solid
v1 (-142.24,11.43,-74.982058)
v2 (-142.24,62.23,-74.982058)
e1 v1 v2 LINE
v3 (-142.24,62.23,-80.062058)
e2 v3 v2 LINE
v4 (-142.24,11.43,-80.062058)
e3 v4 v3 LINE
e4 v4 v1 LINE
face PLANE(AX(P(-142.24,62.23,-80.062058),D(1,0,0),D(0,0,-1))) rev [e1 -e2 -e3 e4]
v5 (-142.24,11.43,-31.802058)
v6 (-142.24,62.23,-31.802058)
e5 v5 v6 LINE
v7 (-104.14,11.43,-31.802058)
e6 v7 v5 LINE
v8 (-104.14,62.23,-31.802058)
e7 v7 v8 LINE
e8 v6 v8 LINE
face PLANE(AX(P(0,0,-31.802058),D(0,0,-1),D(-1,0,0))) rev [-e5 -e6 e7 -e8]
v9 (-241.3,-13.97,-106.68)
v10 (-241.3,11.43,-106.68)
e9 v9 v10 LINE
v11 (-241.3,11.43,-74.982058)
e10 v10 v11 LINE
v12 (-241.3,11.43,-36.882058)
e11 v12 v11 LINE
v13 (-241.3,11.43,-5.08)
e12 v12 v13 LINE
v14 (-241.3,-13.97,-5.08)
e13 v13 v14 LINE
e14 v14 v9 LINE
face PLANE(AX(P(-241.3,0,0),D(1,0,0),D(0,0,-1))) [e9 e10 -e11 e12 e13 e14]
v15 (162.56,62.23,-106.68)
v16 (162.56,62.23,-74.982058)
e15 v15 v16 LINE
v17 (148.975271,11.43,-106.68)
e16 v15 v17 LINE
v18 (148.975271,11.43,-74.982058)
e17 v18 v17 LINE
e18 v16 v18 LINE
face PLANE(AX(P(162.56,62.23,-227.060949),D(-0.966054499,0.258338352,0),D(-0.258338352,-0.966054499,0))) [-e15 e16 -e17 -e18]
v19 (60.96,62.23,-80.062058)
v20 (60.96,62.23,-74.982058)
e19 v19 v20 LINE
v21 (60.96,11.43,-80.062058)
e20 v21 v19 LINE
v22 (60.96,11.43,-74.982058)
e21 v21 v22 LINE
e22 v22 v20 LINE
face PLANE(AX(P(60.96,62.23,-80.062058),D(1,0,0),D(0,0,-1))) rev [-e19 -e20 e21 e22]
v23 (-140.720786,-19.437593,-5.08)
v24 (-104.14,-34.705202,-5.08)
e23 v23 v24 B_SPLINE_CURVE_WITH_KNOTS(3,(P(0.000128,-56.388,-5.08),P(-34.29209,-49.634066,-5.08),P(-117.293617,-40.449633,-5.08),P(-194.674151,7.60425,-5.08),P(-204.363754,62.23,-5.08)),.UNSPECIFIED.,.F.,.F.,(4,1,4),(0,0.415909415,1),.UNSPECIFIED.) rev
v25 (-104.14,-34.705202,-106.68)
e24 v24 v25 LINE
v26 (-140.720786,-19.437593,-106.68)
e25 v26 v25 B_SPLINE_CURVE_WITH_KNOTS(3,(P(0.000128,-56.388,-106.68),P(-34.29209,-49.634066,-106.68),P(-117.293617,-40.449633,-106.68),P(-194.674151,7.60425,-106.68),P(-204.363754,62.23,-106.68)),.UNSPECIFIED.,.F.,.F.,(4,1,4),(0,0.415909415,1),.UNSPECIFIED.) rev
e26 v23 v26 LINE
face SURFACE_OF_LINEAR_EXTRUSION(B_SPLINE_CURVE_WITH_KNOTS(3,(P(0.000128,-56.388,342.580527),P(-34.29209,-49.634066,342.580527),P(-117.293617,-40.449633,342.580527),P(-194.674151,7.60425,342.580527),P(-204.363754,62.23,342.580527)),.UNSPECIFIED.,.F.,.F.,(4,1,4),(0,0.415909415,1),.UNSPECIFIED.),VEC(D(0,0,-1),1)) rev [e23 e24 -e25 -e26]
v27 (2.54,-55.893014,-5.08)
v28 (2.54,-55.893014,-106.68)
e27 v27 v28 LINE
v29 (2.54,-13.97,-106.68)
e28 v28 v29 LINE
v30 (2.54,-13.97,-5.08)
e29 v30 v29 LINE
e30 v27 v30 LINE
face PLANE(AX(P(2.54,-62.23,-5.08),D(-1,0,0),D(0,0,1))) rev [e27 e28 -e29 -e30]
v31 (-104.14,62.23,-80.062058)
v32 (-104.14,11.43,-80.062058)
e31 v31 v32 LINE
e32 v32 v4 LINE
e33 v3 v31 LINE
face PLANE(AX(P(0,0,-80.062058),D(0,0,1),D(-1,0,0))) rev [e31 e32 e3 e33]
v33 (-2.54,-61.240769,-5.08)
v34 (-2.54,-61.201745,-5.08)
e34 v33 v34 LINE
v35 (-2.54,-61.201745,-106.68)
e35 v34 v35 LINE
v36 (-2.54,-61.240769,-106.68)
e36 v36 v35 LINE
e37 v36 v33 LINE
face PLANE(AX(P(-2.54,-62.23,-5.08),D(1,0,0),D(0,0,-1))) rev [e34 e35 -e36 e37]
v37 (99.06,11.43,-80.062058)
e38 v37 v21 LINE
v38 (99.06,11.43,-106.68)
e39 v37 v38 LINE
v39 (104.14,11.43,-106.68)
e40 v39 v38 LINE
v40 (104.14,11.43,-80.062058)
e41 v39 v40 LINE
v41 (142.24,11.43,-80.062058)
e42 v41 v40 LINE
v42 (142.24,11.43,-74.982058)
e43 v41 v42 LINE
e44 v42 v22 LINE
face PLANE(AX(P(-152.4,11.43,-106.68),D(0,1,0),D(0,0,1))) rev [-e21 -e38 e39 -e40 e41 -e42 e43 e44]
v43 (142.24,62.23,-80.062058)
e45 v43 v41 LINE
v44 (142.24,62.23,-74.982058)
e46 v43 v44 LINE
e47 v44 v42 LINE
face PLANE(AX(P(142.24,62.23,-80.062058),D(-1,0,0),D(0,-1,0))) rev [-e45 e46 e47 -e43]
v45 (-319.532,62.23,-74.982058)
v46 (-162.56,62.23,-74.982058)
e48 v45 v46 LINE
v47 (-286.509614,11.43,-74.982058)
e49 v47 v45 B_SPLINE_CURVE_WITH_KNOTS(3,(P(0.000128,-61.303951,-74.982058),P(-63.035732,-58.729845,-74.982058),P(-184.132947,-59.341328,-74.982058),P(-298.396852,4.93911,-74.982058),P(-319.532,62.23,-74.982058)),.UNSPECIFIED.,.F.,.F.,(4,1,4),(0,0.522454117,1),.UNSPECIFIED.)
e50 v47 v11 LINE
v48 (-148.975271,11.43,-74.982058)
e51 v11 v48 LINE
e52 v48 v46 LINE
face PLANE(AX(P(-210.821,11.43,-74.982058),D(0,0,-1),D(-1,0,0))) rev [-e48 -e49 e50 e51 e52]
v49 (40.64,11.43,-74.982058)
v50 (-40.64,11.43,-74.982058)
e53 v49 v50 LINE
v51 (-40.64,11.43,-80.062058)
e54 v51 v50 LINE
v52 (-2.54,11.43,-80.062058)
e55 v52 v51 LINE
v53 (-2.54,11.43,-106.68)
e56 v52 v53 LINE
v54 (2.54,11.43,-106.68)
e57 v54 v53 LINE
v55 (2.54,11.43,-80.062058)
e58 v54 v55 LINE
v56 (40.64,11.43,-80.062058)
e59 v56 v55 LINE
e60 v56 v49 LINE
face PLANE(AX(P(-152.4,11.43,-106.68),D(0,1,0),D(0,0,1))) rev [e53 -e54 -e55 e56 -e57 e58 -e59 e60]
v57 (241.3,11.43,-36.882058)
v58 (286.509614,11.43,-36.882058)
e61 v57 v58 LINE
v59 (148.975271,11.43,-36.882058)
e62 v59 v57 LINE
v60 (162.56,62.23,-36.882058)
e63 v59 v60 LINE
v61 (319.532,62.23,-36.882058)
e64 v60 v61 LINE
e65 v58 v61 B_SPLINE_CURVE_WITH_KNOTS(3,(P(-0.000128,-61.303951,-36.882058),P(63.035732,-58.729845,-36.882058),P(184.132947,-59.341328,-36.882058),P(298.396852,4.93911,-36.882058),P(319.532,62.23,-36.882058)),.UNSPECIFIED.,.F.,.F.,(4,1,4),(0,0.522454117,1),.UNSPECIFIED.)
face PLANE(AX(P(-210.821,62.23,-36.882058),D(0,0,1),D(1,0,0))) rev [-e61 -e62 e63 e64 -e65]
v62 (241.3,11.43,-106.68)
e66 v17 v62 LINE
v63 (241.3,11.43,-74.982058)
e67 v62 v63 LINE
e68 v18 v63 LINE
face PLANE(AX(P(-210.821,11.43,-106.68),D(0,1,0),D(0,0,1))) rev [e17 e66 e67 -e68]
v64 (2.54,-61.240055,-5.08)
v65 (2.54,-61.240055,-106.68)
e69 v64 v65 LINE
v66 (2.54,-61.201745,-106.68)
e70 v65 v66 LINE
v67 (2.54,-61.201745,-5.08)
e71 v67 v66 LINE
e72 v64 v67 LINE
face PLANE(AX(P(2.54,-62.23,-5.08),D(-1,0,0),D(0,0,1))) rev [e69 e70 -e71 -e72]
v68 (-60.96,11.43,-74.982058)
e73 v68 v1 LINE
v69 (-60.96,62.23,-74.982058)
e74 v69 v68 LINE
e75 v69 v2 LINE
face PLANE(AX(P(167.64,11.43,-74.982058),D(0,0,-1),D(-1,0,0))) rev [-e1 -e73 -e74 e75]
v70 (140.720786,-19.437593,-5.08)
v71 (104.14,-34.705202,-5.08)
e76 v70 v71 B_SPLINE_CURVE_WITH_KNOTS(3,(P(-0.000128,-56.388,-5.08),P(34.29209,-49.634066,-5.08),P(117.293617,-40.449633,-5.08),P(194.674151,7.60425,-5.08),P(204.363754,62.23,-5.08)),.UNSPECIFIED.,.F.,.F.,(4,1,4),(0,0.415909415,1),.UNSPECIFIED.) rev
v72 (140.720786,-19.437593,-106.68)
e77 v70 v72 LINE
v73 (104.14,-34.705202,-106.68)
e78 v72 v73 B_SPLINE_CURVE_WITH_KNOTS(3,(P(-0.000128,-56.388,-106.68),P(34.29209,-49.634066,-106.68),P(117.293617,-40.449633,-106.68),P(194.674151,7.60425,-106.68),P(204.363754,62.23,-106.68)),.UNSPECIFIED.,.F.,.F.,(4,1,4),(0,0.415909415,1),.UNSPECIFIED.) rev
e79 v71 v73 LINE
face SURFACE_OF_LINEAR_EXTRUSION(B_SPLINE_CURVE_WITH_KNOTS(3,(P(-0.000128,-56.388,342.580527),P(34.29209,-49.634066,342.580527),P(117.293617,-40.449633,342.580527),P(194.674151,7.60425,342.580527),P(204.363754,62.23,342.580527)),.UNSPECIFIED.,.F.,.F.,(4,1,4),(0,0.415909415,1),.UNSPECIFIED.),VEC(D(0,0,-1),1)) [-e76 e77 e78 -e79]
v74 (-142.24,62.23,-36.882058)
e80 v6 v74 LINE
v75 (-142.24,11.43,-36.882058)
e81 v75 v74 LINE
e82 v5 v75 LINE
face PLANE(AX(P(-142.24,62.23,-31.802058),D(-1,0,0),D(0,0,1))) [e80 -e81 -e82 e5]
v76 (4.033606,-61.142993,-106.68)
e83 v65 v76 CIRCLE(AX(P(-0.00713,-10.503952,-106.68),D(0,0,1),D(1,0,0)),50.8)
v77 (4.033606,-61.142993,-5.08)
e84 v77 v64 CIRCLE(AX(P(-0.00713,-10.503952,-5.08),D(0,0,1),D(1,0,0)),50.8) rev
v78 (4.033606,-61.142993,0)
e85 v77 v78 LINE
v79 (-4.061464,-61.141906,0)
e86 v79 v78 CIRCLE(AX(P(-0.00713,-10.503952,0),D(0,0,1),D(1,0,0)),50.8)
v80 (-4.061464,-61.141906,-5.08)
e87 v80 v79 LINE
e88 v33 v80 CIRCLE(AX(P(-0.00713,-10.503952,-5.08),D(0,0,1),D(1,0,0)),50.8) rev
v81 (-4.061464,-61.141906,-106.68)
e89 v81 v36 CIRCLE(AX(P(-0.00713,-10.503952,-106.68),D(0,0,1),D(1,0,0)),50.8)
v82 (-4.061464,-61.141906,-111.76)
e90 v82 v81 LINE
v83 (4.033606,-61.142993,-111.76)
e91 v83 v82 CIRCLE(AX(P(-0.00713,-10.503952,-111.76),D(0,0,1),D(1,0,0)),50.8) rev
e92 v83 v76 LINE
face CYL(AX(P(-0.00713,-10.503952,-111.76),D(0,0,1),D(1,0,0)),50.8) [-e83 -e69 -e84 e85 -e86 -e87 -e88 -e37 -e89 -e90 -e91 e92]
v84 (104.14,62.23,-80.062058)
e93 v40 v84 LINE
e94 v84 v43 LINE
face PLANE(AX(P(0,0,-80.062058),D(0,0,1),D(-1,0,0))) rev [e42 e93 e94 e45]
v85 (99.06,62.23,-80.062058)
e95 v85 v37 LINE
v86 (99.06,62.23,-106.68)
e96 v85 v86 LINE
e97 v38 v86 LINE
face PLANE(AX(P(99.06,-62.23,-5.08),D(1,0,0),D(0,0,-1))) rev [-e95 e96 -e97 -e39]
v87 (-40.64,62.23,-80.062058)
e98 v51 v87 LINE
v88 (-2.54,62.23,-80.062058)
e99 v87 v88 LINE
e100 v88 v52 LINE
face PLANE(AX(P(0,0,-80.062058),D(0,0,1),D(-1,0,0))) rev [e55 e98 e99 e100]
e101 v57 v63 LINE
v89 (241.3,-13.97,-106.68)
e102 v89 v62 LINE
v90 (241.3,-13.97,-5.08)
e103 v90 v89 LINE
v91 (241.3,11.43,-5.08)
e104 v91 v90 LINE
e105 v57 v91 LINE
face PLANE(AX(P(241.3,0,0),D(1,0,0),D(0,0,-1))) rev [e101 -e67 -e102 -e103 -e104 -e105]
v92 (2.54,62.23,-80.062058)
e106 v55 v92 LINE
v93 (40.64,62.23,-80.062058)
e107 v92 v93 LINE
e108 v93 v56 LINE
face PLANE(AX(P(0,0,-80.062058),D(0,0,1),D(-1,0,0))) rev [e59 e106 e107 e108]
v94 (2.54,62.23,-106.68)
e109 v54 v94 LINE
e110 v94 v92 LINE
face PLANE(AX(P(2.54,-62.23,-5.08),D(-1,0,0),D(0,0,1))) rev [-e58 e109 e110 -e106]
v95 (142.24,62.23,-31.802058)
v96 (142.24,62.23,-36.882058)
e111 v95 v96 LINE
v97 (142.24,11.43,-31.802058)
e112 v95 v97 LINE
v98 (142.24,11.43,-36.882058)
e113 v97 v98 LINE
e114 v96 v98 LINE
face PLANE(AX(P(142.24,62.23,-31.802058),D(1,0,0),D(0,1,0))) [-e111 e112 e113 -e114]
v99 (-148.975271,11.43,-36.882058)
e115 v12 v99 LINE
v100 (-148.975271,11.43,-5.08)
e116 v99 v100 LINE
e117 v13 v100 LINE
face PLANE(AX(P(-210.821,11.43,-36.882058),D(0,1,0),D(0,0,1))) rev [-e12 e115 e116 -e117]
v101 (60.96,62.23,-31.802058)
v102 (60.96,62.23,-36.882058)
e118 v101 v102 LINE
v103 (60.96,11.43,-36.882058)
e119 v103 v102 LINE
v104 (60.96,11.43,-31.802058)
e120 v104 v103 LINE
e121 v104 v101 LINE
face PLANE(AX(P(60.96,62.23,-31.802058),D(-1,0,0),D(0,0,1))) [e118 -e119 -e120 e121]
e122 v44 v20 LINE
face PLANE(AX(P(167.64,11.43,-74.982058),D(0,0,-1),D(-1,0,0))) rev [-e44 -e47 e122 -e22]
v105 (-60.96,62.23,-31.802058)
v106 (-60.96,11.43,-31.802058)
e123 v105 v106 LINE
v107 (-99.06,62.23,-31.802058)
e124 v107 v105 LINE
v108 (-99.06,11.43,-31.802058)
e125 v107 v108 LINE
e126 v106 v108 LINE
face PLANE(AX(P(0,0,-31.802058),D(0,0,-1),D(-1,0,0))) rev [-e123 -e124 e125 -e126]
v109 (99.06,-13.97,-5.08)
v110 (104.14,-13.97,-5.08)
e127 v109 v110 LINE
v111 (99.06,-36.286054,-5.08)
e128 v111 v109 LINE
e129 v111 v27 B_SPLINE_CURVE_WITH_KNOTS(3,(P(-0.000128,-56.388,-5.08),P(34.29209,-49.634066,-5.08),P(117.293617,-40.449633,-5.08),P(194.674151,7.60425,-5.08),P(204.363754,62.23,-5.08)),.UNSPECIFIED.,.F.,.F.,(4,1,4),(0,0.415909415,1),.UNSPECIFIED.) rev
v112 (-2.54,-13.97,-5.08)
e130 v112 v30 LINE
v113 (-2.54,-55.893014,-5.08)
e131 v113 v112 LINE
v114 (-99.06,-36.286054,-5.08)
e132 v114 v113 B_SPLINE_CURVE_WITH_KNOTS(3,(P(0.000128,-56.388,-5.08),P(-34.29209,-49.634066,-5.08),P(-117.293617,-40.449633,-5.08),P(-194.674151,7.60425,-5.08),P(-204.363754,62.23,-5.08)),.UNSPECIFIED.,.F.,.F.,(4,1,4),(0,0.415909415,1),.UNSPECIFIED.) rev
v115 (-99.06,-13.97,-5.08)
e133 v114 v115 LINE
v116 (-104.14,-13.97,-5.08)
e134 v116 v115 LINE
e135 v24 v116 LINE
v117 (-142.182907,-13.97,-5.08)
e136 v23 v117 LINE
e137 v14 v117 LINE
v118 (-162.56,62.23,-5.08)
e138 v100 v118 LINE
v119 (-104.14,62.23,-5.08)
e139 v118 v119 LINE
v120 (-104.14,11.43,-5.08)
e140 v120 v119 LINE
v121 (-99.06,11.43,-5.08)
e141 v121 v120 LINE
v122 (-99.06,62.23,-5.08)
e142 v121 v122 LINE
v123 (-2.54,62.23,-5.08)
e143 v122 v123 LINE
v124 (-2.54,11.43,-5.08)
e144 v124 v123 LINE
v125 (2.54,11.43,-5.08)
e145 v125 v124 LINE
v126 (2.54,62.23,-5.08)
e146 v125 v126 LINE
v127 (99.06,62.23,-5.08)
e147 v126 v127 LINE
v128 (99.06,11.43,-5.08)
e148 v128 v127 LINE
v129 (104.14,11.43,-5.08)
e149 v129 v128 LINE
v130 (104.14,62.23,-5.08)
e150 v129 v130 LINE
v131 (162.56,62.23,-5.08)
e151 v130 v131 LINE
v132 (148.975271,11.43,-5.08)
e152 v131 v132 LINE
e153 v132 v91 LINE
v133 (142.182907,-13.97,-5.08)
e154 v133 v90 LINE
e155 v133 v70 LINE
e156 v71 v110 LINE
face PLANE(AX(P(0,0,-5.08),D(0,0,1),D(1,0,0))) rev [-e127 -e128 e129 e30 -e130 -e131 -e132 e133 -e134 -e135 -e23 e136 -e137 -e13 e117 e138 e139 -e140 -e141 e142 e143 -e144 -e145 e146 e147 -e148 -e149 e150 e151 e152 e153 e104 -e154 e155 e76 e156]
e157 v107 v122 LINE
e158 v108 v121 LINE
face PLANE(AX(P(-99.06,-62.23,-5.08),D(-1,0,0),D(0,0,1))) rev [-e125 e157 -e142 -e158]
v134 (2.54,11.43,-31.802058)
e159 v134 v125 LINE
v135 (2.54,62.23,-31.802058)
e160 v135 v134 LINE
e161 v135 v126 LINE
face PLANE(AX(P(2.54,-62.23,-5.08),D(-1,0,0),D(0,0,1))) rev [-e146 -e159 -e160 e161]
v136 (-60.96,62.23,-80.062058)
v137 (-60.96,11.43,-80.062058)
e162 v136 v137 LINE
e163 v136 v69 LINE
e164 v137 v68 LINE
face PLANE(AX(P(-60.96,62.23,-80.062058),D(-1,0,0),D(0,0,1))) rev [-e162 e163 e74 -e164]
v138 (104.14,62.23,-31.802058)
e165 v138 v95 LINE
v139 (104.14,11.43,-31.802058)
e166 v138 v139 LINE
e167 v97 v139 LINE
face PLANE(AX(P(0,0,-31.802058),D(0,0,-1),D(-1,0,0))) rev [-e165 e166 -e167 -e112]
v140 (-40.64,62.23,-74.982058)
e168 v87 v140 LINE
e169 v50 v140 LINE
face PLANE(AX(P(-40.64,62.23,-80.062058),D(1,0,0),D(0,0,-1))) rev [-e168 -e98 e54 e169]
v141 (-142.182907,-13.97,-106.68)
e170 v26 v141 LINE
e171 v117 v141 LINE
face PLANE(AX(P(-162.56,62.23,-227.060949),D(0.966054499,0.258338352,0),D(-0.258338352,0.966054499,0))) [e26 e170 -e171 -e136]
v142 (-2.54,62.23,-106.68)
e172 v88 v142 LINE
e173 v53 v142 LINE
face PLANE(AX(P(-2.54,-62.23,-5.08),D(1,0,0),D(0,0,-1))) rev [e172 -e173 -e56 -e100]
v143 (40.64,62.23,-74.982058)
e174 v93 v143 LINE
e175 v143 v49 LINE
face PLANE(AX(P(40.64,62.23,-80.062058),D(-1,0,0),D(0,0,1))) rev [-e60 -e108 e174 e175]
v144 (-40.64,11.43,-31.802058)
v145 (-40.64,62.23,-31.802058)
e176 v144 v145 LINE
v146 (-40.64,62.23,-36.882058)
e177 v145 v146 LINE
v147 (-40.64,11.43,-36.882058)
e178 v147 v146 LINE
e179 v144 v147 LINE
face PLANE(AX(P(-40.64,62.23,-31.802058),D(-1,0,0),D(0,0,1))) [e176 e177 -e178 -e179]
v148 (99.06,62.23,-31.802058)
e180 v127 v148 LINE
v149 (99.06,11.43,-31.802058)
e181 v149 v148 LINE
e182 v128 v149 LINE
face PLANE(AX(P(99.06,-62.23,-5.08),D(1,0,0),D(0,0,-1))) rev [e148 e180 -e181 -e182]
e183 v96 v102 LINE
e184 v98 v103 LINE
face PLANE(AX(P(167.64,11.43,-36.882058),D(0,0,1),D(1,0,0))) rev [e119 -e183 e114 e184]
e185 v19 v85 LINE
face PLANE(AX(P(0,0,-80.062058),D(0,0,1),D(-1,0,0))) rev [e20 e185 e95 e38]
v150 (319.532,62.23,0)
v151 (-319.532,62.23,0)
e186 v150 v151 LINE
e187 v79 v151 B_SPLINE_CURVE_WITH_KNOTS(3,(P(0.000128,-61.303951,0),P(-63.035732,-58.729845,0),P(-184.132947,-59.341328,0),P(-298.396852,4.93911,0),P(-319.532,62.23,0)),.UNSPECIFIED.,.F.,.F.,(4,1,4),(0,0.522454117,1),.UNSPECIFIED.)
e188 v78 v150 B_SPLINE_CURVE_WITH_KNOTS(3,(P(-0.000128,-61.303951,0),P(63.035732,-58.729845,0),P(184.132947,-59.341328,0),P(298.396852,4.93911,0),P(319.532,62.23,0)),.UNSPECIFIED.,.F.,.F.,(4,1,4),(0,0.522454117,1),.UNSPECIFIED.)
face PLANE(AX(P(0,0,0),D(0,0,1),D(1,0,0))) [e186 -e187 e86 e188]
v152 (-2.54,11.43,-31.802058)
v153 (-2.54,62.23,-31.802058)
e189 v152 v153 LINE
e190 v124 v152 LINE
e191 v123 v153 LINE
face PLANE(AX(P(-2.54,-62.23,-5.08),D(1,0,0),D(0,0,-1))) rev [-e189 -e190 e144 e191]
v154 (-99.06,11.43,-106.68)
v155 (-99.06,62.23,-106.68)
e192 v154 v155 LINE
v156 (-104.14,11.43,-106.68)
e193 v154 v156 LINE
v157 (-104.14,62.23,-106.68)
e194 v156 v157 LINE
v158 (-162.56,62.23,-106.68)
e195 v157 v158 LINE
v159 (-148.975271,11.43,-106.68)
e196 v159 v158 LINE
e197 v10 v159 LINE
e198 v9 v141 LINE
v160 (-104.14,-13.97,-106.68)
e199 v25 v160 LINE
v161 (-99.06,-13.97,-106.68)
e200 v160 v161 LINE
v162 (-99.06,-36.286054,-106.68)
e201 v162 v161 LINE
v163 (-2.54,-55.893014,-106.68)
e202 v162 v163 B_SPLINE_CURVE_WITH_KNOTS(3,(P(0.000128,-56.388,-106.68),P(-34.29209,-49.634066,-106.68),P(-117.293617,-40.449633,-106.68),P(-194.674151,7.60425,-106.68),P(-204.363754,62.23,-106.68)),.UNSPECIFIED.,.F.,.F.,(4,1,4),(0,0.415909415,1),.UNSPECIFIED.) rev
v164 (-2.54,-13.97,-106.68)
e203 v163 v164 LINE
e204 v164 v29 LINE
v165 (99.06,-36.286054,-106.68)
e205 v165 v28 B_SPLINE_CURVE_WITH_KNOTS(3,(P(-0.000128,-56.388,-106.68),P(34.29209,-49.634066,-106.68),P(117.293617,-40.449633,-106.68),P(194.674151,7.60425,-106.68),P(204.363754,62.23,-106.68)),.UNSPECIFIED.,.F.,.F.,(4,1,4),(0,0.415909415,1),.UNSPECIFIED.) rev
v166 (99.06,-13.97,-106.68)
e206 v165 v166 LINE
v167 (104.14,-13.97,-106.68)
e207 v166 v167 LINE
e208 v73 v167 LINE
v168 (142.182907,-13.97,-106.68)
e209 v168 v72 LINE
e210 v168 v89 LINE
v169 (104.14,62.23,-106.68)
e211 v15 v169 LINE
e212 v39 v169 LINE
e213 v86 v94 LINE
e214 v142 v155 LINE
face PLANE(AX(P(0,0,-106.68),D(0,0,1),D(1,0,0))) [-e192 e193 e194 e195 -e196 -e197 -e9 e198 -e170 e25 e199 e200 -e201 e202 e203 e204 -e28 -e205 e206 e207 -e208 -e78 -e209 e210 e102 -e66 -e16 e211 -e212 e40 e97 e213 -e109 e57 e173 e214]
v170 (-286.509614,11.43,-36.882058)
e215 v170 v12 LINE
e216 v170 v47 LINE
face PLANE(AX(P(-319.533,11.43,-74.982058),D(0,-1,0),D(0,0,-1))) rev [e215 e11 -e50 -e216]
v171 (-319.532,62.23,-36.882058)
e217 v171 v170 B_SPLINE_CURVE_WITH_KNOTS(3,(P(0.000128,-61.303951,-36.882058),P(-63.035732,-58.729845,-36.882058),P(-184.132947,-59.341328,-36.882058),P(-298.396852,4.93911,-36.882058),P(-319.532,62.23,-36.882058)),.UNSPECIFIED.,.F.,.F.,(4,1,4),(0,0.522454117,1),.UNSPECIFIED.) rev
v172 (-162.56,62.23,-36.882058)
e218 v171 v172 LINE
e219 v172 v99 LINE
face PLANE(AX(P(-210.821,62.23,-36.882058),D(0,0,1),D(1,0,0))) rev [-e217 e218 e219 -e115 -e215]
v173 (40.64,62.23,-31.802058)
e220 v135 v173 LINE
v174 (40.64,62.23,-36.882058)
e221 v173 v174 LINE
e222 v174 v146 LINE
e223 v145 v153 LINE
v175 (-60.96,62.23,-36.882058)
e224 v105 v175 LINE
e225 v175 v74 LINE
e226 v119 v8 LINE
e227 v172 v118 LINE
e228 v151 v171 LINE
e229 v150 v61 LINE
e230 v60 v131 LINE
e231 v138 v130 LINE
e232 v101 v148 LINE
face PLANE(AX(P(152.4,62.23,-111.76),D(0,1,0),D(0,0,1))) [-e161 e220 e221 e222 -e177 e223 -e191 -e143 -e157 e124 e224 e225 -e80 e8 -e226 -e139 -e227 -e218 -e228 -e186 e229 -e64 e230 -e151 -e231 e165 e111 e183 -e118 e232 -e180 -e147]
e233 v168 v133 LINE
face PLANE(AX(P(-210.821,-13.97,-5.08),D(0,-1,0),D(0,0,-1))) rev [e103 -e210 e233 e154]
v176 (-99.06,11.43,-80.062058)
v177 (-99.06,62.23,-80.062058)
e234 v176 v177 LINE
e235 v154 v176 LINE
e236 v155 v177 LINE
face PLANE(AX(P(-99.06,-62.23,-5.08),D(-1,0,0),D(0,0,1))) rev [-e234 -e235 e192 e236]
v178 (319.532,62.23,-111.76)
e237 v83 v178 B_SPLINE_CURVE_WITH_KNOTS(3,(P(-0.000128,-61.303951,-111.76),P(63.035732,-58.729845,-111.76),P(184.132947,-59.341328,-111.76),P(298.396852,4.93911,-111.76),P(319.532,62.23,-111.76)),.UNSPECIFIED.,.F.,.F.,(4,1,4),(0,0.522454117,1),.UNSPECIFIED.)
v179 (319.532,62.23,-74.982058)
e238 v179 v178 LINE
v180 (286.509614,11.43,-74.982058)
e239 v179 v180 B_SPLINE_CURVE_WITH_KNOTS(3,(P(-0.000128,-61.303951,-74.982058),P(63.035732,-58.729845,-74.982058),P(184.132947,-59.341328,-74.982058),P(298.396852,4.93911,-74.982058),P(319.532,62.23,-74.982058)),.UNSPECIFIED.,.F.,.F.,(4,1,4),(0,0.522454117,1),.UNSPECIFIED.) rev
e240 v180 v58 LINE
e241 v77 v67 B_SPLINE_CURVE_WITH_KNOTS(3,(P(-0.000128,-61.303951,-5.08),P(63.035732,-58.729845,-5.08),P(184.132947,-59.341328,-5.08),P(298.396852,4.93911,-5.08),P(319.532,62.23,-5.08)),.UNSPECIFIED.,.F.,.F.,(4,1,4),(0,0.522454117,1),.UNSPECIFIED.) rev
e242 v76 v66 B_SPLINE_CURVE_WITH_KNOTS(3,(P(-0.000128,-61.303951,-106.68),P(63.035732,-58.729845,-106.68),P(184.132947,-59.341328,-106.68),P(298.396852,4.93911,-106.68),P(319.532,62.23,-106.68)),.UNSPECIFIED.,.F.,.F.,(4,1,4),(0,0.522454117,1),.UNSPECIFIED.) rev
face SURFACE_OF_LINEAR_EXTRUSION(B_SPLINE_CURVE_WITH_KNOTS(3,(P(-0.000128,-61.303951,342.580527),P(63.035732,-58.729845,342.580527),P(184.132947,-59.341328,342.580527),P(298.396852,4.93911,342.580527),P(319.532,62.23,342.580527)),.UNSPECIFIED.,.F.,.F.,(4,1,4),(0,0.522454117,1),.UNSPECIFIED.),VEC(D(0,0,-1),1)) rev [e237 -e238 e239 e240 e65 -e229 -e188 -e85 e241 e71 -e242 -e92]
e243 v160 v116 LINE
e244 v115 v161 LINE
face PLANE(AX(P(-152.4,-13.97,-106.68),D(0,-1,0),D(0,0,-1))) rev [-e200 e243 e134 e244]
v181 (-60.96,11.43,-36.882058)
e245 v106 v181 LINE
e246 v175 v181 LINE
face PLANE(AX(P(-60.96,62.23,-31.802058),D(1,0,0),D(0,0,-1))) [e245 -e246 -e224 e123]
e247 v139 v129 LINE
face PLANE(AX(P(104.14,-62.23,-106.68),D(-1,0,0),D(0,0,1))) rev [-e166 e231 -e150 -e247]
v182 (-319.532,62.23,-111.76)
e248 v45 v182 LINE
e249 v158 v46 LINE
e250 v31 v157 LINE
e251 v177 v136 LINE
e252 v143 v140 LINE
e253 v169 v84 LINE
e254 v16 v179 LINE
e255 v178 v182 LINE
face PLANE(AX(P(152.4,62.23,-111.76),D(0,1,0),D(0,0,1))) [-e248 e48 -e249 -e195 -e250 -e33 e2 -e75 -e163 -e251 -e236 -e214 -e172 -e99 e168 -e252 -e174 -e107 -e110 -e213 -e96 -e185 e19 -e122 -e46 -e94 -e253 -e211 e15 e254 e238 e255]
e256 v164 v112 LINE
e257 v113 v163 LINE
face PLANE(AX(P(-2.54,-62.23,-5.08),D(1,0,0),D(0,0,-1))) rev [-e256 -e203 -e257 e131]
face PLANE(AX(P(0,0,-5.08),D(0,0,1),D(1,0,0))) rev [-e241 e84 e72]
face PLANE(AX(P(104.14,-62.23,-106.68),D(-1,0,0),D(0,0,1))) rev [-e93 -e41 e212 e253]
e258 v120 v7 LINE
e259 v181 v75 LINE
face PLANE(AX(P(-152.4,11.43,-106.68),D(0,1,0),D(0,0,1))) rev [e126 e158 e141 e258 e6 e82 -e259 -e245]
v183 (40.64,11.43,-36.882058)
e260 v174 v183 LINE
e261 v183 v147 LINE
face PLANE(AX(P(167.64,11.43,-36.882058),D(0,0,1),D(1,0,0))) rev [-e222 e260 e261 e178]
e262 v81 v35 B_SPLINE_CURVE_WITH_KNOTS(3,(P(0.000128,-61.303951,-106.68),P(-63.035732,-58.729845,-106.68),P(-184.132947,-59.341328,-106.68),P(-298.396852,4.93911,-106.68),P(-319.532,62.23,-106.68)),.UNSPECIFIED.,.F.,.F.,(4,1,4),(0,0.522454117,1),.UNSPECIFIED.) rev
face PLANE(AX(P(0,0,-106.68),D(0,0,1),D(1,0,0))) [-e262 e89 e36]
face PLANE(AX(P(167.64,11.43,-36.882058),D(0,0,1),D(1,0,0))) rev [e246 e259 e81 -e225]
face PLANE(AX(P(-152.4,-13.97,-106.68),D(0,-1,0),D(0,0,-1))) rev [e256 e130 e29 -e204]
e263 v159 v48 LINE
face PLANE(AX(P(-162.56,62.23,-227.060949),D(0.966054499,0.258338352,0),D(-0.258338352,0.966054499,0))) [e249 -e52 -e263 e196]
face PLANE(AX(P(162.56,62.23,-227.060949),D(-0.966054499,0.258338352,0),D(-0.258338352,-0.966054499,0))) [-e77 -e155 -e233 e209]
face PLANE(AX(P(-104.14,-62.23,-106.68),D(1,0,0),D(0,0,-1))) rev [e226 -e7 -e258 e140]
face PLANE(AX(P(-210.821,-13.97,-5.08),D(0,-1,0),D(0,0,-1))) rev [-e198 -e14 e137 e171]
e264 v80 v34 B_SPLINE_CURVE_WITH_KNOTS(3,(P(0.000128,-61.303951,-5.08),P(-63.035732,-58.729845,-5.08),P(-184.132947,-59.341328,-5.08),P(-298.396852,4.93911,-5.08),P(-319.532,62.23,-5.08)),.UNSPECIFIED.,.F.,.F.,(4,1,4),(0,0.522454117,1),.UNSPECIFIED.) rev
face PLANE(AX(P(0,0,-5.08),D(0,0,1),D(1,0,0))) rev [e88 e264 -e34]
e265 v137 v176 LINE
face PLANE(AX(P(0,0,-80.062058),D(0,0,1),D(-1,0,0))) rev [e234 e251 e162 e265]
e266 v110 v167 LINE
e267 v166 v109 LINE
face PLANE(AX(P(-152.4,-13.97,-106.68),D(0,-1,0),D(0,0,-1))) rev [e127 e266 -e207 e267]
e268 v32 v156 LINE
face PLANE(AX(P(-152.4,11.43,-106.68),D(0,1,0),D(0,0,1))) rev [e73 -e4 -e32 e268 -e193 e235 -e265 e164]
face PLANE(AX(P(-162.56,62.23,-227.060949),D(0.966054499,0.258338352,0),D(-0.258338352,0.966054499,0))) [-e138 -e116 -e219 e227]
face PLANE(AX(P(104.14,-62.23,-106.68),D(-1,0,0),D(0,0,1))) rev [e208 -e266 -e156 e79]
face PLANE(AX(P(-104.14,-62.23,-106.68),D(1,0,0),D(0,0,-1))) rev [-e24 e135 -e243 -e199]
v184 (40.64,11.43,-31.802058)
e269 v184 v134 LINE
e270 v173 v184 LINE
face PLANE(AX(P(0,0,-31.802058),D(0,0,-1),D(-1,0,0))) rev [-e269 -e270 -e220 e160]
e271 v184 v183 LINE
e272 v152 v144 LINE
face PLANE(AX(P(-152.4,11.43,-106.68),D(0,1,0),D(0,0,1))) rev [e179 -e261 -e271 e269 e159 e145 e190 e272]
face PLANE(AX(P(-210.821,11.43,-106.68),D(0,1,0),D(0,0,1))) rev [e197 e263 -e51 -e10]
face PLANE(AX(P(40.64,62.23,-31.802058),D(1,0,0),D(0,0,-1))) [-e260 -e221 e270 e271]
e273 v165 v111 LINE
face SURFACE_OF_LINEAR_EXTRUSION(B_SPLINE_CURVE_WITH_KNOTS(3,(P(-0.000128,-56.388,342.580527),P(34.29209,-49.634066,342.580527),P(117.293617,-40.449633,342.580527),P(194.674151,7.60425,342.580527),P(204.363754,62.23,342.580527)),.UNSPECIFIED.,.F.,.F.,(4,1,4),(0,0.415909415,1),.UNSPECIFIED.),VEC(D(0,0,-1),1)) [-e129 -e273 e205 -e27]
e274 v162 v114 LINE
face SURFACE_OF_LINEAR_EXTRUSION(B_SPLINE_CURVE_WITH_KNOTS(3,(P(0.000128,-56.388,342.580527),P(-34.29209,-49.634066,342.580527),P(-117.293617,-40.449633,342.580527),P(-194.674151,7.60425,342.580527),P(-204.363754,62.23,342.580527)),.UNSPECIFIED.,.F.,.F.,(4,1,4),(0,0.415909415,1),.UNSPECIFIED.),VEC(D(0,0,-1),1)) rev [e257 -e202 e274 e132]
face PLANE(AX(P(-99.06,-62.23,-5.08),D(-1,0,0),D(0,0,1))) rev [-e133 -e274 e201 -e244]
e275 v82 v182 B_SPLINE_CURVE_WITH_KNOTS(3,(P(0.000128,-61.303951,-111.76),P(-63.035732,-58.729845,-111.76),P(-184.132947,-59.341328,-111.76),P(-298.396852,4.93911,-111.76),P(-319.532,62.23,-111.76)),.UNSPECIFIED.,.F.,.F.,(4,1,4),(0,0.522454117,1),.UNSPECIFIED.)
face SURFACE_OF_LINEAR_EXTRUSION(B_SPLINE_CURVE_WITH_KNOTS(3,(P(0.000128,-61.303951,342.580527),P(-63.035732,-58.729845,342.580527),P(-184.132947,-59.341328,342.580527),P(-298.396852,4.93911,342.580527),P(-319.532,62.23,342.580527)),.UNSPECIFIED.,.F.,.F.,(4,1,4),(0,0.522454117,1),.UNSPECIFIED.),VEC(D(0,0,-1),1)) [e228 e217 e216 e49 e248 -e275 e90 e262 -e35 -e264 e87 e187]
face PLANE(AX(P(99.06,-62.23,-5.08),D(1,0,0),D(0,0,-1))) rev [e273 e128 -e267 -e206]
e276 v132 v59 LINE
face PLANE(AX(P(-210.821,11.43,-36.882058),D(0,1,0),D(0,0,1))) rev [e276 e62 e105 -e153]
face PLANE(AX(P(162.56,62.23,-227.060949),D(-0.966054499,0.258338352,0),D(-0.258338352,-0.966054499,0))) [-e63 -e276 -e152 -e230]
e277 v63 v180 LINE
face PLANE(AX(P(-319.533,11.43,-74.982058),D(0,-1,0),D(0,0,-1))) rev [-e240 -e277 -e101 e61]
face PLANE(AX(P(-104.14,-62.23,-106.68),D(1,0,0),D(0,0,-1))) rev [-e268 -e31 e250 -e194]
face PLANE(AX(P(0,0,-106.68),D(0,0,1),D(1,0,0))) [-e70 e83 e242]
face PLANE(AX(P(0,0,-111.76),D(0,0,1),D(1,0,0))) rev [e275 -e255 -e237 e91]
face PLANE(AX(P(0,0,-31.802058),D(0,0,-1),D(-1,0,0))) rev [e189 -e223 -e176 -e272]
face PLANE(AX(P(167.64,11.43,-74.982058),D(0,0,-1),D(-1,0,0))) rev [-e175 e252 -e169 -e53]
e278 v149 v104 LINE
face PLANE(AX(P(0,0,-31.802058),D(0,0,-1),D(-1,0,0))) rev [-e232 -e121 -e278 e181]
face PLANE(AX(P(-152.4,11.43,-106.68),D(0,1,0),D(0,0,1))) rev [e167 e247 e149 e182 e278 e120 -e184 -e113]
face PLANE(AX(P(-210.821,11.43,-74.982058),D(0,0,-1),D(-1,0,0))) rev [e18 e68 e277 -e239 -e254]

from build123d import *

# Parameters (mm, degrees)
BOSS_EXTRUDE1_DEPTH                 = 111.76
SKETCH5_W                           = 304.8
SKETCH5_H                           = 25.4
CUT_EXTRUDE3_DEPTH                  = 101.6
CUT_EXTRUDE4_DEPTH                  = 227.288199427
CUT_EXTRUDE4_DEPTH_BACK             = 227.288199427
SKETCH3_W                           = 96.52
SKETCH3_H                           = 101.6
SKETCH3_W_2                         = 48.26
CUT_EXTRUDE5_REACH                  = 288.663
SKETCH6_W                           = 38.1
SKETCH6_H                           = 50.8
SKETCH7_W                           = 81.28
SKETCH7_H                           = 50.8
BOSS_EXTRUDE2_DEPTH                 = 5.08
SKETCH9_W                           = 5.08
SKETCH9_H                           = 95.25
BOSS_EXTRUDE3_DEPTH                 = 10.16
SKETCH10_W                          = 5.08
SKETCH10_H                          = 95.206439839
BOSS_EXTRUDE4_DEPTH                 = 10.16
CUT_EXTRUDE7_REACH                  = 208.854
FILLET1_R                           = 50.8
BOSS_EXTRUDE5_REACH                 = 208.854
CUT_EXTRUDE8_REACH                  = 248.593
CUT_EXTRUDE8_END_RADIUS             = 126.32098656
CUT_EXTRUDE8_DIRECTION_2_REACH      = 248.593
CUT_EXTRUDE8_DIRECTION_2_END_RADIUS = 126.32098656
BOSS_EXTRUDE6_REACH                 = 248.593
CUT_EXTRUDE9_DEPTH                  = 241.3
CUT_EXTRUDE9_DEPTH_BACK             = 241.3
CUT_EXTRUDE10_REACH                 = 346.185
SKETCH16_W                          = 38.1
SKETCH16_H                          = 50.8
CUT_EXTRUDE10_DIRECTION_2_REACH     = 346.185


with BuildPart() as part:
    # Sketch1 → Boss-Extrude1 (new body)
    with BuildSketch(Plane.XY):
        Polygon((-152.4, 62.23), (-152.4, -33.02), (0, -62.23), (152.4, -32.976439839), (152.4, 62.23), align=None)
    extrude(amount=-BOSS_EXTRUDE1_DEPTH)

    # Sketch5 → Cut-Extrude3 (cut)
    with BuildSketch(Plane.XY.offset(-5.08)):
        with Locations((0, -1.27)):
            Rectangle(SKETCH5_W, SKETCH5_H)
    extrude(amount=-CUT_EXTRUDE3_DEPTH, mode=Mode.SUBTRACT)

    # Sketch3 → Cut-Extrude4 (cut, two sides: drawn at the far end of the back side and taken through both)
    with BuildSketch(Plane(origin=(0, 62.23, 0), x_dir=(1, 0, 0), z_dir=(0, 1, 0)).offset(-CUT_EXTRUDE4_DEPTH_BACK)):
        with Locations((-50.8, 55.88)):
            Rectangle(SKETCH3_W, SKETCH3_H)
        with Locations((50.8, 55.88)):
            Rectangle(SKETCH3_W, SKETCH3_H)
        with Locations((-128.27, 55.88)):
            Rectangle(SKETCH3_W_2, SKETCH3_H)
        with Locations((128.27, 55.88)):
            Rectangle(SKETCH3_W_2, SKETCH3_H)
    extrude(amount=CUT_EXTRUDE4_DEPTH + CUT_EXTRUDE4_DEPTH_BACK, mode=Mode.SUBTRACT)

    # Cut-Extrude5: up to this face of the body (flat: up to its plane)
    cut_extrude5_end = Plane(part.part.faces().sort_by_distance((104.14, 36.83, -55.88))[0])
    # Sketch6 → Cut-Extrude5 (cut, up to the picked face)
    with BuildSketch(Plane.ZY.offset(104.14), mode=Mode.PRIVATE) as cut_extrude5_sk1:
        with Locations((-55.932057734, 36.83)):
            Rectangle(SKETCH6_W, SKETCH6_H)
    cut_extrude5_tool1 = split(extrude(cut_extrude5_sk1.sketch, amount=-CUT_EXTRUDE5_REACH, mode=Mode.PRIVATE), bisect_by=cut_extrude5_end, keep=Keep.BOTH, mode=Mode.PRIVATE)
    add(cut_extrude5_tool1.solids().sort_by(Axis((-104.14, 36.83, -55.932058), (1, 0, 0)))[0], mode=Mode.SUBTRACT)

    # Sketch7 → Boss-Extrude2 (add)
    with BuildSketch(Plane(origin=(0, 0, -36.882057734), x_dir=(-1, 0, 0), z_dir=(0, 0, -1))):
        with Locations((0, 36.83)):
            Rectangle(SKETCH7_W, SKETCH7_H)
        with Locations((101.6, 36.83)):
            Rectangle(SKETCH7_W, SKETCH7_H)
        with Locations((-101.6, 36.83)):
            Rectangle(SKETCH7_W, SKETCH7_H)
    boss_extrude2 = extrude(amount=-BOSS_EXTRUDE2_DEPTH)

    # Mirror1: Boss-Extrude2 across plane
    add(boss_extrude2.mirror(Plane(origin=(0, 0, -55.932057734), x_dir=(1, 0, 0), z_dir=(0, 0, -1))))

    # Sketch9 → Boss-Extrude3 (add)
    with BuildSketch(Plane.ZY.offset(152.4)):
        with Locations((-109.22, 14.605)):
            Rectangle(SKETCH9_W, SKETCH9_H)
        with Locations((-2.54, 14.605)):
            Rectangle(SKETCH9_W, SKETCH9_H)
    extrude(amount=BOSS_EXTRUDE3_DEPTH)

    # Sketch10 → Boss-Extrude4 (add)
    with BuildSketch(Plane(origin=(152.4, 0, 0), x_dir=(0, 0, -1), z_dir=(1, 0, 0))):
        with Locations((2.54, 14.626780081)):
            Rectangle(SKETCH10_W, SKETCH10_H)
        with Locations((109.22, 14.626780081)):
            Rectangle(SKETCH10_W, SKETCH10_H)
    extrude(amount=BOSS_EXTRUDE4_DEPTH)

    # Cut-Extrude7: up to this face of the body (flat: up to its plane)
    cut_extrude7_end = Plane(part.part.faces().sort_by_distance((-0.011490312, 7.400814094, -111.76))[0])
    # Sketch11 → Cut-Extrude7 (cut, up to the picked face)
    with BuildSketch(Plane.XY, mode=Mode.PRIVATE) as cut_extrude7_sk1:
        Polygon((-162.56, -12.7), (-119.696308585, -39.288207521), (-152.4, -33.02), (-162.56, -33.02), align=None)
    cut_extrude7_tool1 = split(extrude(cut_extrude7_sk1.sketch, amount=-CUT_EXTRUDE7_REACH, mode=Mode.PRIVATE), bisect_by=cut_extrude7_end, keep=Keep.BOTH, mode=Mode.PRIVATE)
    # Sketch11 → Cut-Extrude7 (cut, up to the picked face)
    with BuildSketch(Plane.XY, mode=Mode.PRIVATE) as cut_extrude7_sk2:
        Polygon((152.4, -33.02), (162.56, -33.02), (162.56, -12.7), (119.696308585, -39.288207521), align=None)
    cut_extrude7_tool2 = split(extrude(cut_extrude7_sk2.sketch, amount=-CUT_EXTRUDE7_REACH, mode=Mode.PRIVATE), bisect_by=cut_extrude7_end, keep=Keep.BOTH, mode=Mode.PRIVATE)
    add(cut_extrude7_tool1.solids().sort_by(Axis((-148.539263, -27.801749, 0), (0, 0, -1)))[0], mode=Mode.SUBTRACT)
    add(cut_extrude7_tool2.solids().sort_by(Axis((148.539263, -27.801749, 0), (0, 0, -1)))[0], mode=Mode.SUBTRACT)

    # Fillet1
    # the kernel refuses this fillet: 50.8 mm, written as the material it takes off along each edge
    with BuildSketch(Plane(origin=(-162.56, -12.7, 70.671047804), x_dir=(0.8497897447130388, -0.5271217978613181, 0), z_dir=(0, 0, -1)), Plane(origin=(-162.56, -12.7, -36.008952196), x_dir=(0.8497897447130388, -0.5271217978613181, 0), z_dir=(0, 0, -1)), Plane(origin=(162.56, -12.7, 70.671047804), x_dir=(0, 1, 0), z_dir=(0, 0, -1))) as fillet1_piece_1:
        with BuildLine():
            CenterArc((FILLET1_R * 0.556464943335, -FILLET1_R), FILLET1_R, 90, 58.188808221)
            Line((-FILLET1_R * 0.293324801378, -FILLET1_R * 0.472878202139), (0, 0))
            Line((0, 0), (FILLET1_R * 0.556464943335, 0))
        make_face()
    extrude(amount=146.422095607, mode=Mode.SUBTRACT)
    with BuildSketch(Plane(origin=(-119.696308585, -39.288207521, -83.186546401), x_dir=(0.9821230119270369, -0.18824024395268216, 0), z_dir=(0, 0, -1)), Plane(origin=(-119.696308585, -39.288207521, 23.493453599), x_dir=(0.9821230119270369, -0.18824024395268216, 0), z_dir=(0, 0, -1))) as fillet1_piece_2:
        with BuildLine():
            CenterArc((FILLET1_R * 0.184987823618, -FILLET1_R), FILLET1_R, 90, 20.961087149)
            Line((-FILLET1_R * 0.172745995297, -FILLET1_R * 0.0661764005955), (0, 0))
            Line((0, 0), (FILLET1_R * 0.184987823618, 0))
        make_face()
    extrude(amount=52.066907199, mode=Mode.SUBTRACT)
    with BuildSketch(Plane(origin=(162.56, -12.7, -36.008952196), x_dir=(-0.8497897447130388, -0.5271217978613181, 0), z_dir=(0, 0, -1))) as fillet1_piece_3:
        with BuildLine():
            CenterArc((FILLET1_R * 0.556464943335, FILLET1_R), FILLET1_R, 211.811191779, 58.188808221)
            Line((-FILLET1_R * 0.293324801378, FILLET1_R * 0.472878202139), (0, 0))
            Line((0, 0), (FILLET1_R * 0.556464943335, 0))
        make_face()
    extrude(amount=146.422095607, mode=Mode.SUBTRACT)
    with BuildSketch(Plane(origin=(119.776180176, -39.238663434, -83.204651008), x_dir=(-0.9820710795721669, -0.18851099349363817, 0), z_dir=(0, 0, -1)), Plane(origin=(119.776180176, -39.238663434, 23.475348992), x_dir=(-0.9820710795721669, -0.18851099349363817, 0), z_dir=(0, 0, -1))) as fillet1_piece_4:
        with BuildLine():
            CenterArc((FILLET1_R * 0.184845267653, FILLET1_R), FILLET1_R, 249.054708445, 20.945291555)
            Line((-FILLET1_R * 0.172631096402, FILLET1_R * 0.0660778141933), (0, 0))
            Line((0, 0), (FILLET1_R * 0.184845267653, 0))
        make_face()
    extrude(amount=52.030697984, mode=Mode.SUBTRACT)
    with BuildSketch(Plane(origin=(0, -62.23, 24.359816254), x_dir=(-0.982123011927037, 0.1882402439526816, 0), z_dir=(0, 0, -1))) as fillet1_piece_5:
        with BuildLine():
            CenterArc((FILLET1_R * 0.191809576801, FILLET1_R), FILLET1_R, 248.283995147, 21.716004853)
            Line((-FILLET1_R * 0.178196707507, FILLET1_R * 0.0709707488072), (0, 0))
            Line((0, 0), (FILLET1_R * 0.191809576801, 0))
        make_face()
    extrude(amount=160.479632508, mode=Mode.SUBTRACT)

    # Boss-Extrude5: up to this face of the body (flat: up to its plane)
    boss_extrude5_end = Plane(part.part.faces().sort_by_distance((-0.004732582, 8.379000895, -111.76))[0])
    # Sketch12 → Boss-Extrude5 (add, up to the picked face)
    with BuildSketch(Plane.XY, mode=Mode.PRIVATE) as boss_extrude5_sk1:
        with BuildLine():
            Line((-162.56, 62.23), (-210.82, 62.23))
            ThreePointArc((-210.82, 62.23), (-185.525923559, 8.586514121), (-138.537787331, -27.60089991))
            Line((-138.537787331, -27.60089991), (-162.56, 62.23))
        make_face()
    boss_extrude5_tool1 = split(extrude(boss_extrude5_sk1.sketch, amount=-BOSS_EXTRUDE5_REACH, mode=Mode.PRIVATE), bisect_by=boss_extrude5_end, keep=Keep.BOTH, mode=Mode.PRIVATE)
    # Sketch12 → Boss-Extrude5 (add, up to the picked face)
    with BuildSketch(Plane.XY, mode=Mode.PRIVATE) as boss_extrude5_sk2:
        with BuildLine():
            Line((162.56, 62.23), (210.82, 62.23))
            ThreePointArc((210.82, 62.23), (185.525923559, 8.586514121), (138.537787331, -27.60089991))
            Line((138.537787331, -27.60089991), (162.56, 62.23))
        make_face()
    boss_extrude5_tool2 = split(extrude(boss_extrude5_sk2.sketch, amount=-BOSS_EXTRUDE5_REACH, mode=Mode.PRIVATE), bisect_by=boss_extrude5_end, keep=Keep.BOTH, mode=Mode.PRIVATE)
    add(boss_extrude5_tool1.solids().sort_by(Axis((-173.436994, 26.131053, 0), (0, 0, -1)))[0])
    add(boss_extrude5_tool2.solids().sort_by(Axis((173.436994, 26.131053, 0), (0, 0, -1)))[0])

    # Cut-Extrude8: up to this cylinder (the profile starts inside it)
    cut_extrude8_end = Plane(origin=(-87.109319049, 87.777192878, -55.90231), z_dir=(0, 0, 1)) * Cylinder(CUT_EXTRUDE8_END_RADIUS, 750.827973119, mode=Mode.PRIVATE)
    # Sketch13 → Cut-Extrude8 (cut, up to the surface)
    with BuildSketch(Plane(origin=(0, 0, 0), x_dir=(0, 0, -1), z_dir=(1, 0, 0)), mode=Mode.PRIVATE) as cut_extrude8_sk1:
        Polygon((36.882057734, 62.23), (36.882057734, 11.43), (5.08, 11.43), (5.08, -13.97), (106.68, -13.97), (106.68, 11.43), (74.982057734, 11.43), (74.982057734, 62.23), align=None)
    cut_extrude8_tool1 = extrude(cut_extrude8_sk1.sketch, amount=-CUT_EXTRUDE8_REACH, mode=Mode.PRIVATE) & cut_extrude8_end
    add(cut_extrude8_tool1.solids().sort_by_distance((0, 15.058571, -55.90231))[0], mode=Mode.SUBTRACT)

    # Cut-Extrude8 direction 2: up to this cylinder (the profile starts inside it)
    cut_extrude8_direction_2_end = Plane(origin=(87.109319049, 87.777192878, -55.90231), z_dir=(0, 0, 1)) * Cylinder(CUT_EXTRUDE8_DIRECTION_2_END_RADIUS, 750.827973119, mode=Mode.PRIVATE)
    # Sketch13 → Cut-Extrude8 direction 2 (cut, up to the surface)
    with BuildSketch(Plane(origin=(0, 0, 0), x_dir=(0, 0, -1), z_dir=(1, 0, 0)), mode=Mode.PRIVATE) as cut_extrude8_direction_2_sk1:
        Polygon((36.882057734, 62.23), (36.882057734, 11.43), (5.08, 11.43), (5.08, -13.97), (106.68, -13.97), (106.68, 11.43), (74.982057734, 11.43), (74.982057734, 62.23), align=None)
    cut_extrude8_direction_2_tool1 = extrude(cut_extrude8_direction_2_sk1.sketch, amount=CUT_EXTRUDE8_DIRECTION_2_REACH, mode=Mode.PRIVATE) & cut_extrude8_direction_2_end
    add(cut_extrude8_direction_2_tool1.solids().sort_by_distance((0, 15.058571, -55.90231))[0], mode=Mode.SUBTRACT)

    # Boss-Extrude6: up to this face of the body (flat: up to its plane)
    boss_extrude6_end = Plane(part.part.faces().sort_by_distance((-0.004136206, 11.247831231, 0))[0])
    # Sketch14 → Boss-Extrude6 (add, up to the picked face)
    with BuildSketch(Plane(origin=(0, 0, -111.76), x_dir=(-1, 0, 0), z_dir=(0, 0, -1)), mode=Mode.PRIVATE) as boss_extrude6_sk1:
        with BuildLine():
            Line((-204.363754457, 62.23), (-319.532, 62.23))
            add(Edge.make_bspline(
                [(0.000127649, -61.30395141), (-63.035732171, -58.729844517), (-184.13294652, -59.341328161), (-298.396851531, 4.939109547), (-319.532, 62.23)],
                knots=[0, 0, 0, 0, 0.522454117, 1, 1, 1, 1], degree=3))
            Line((0.000127649, -61.30395141), (0.000127649, -56.388))
            add(Edge.make_bspline(
                [(0.000127649, -56.388), (-34.292089751, -49.634065585), (-117.293617019, -40.449633361), (-194.674150599, 7.604249577), (-204.363754457, 62.23)],
                knots=[0, 0, 0, 0, 0.415909415, 1, 1, 1, 1], degree=3))
        make_face()
    boss_extrude6_tool1 = split(extrude(boss_extrude6_sk1.sketch, amount=-BOSS_EXTRUDE6_REACH, mode=Mode.PRIVATE), bisect_by=boss_extrude6_end, keep=Keep.BOTH, mode=Mode.PRIVATE)
    # Sketch14 → Boss-Extrude6 (add, up to the picked face)
    with BuildSketch(Plane(origin=(0, 0, -111.76), x_dir=(-1, 0, 0), z_dir=(0, 0, -1)), mode=Mode.PRIVATE) as boss_extrude6_sk2:
        with BuildLine():
            Line((0.000127649, -56.388), (0.000127649, -61.30395141))
            add(Edge.make_bspline(
                [(0.000127649, -61.30395141), (63.035732171, -58.729844517), (184.13294652, -59.341328161), (298.396851531, 4.939109547), (319.532, 62.23)],
                knots=[0, 0, 0, 0, 0.522454117, 1, 1, 1, 1], degree=3))
            Line((319.532, 62.23), (204.363754457, 62.23))
            add(Edge.make_bspline(
                [(0.000127649, -56.388), (34.292089751, -49.634065585), (117.293617019, -40.449633361), (194.674150599, 7.604249577), (204.363754457, 62.23)],
                knots=[0, 0, 0, 0, 0.415909415, 1, 1, 1, 1], degree=3))
        make_face()
    boss_extrude6_tool2 = split(extrude(boss_extrude6_sk2.sketch, amount=-BOSS_EXTRUDE6_REACH, mode=Mode.PRIVATE), bisect_by=boss_extrude6_end, keep=Keep.BOTH, mode=Mode.PRIVATE)
    add(boss_extrude6_tool1.solids().sort_by(Axis((202.795825, 2.026931, -111.76), (0, 0, 1)))[0])
    add(boss_extrude6_tool2.solids().sort_by(Axis((-202.795984, 2.026638, -111.76), (0, 0, 1)))[0])

    # Sketch15 → Cut-Extrude9 (cut, two sides: drawn at the far end of the back side and taken through both)
    with BuildSketch(Plane(origin=(0, 0, 0), x_dir=(0, 0, -1), z_dir=(1, 0, 0)).offset(-CUT_EXTRUDE9_DEPTH_BACK)):
        Polygon((36.882057734, 62.23), (36.882057734, 11.43), (5.08, 11.43), (5.08, -13.97), (106.68, -13.97), (106.68, 11.43), (74.982057734, 11.43), (74.982057734, 62.23), align=None)
    extrude(amount=CUT_EXTRUDE9_DEPTH + CUT_EXTRUDE9_DEPTH_BACK, mode=Mode.SUBTRACT)

    # Sketch16 → Cut-Extrude10 (cut, up to next)
    with BuildSketch(Plane(origin=(0, 0, 0), x_dir=(0, 0, -1), z_dir=(1, 0, 0)), mode=Mode.PRIVATE) as cut_extrude10_sk1:
        with Locations((55.932057734, 36.83)):
            Rectangle(SKETCH16_W, SKETCH16_H)
    cut_extrude10_tool1 = extrude(cut_extrude10_sk1.sketch, amount=-CUT_EXTRUDE10_REACH, mode=Mode.PRIVATE) & part.part
    add(cut_extrude10_tool1.solids().sort_by_distance((0, 36.83, -55.932058))[0], mode=Mode.SUBTRACT)

    # Sketch16 → Cut-Extrude10 direction 2 (cut, up to next)
    with BuildSketch(Plane(origin=(0, 0, 0), x_dir=(0, 0, -1), z_dir=(1, 0, 0)), mode=Mode.PRIVATE) as cut_extrude10_direction_2_sk1:
        with Locations((55.932057734, 36.83)):
            Rectangle(SKETCH16_W, SKETCH16_H)
    cut_extrude10_direction_2_tool1 = extrude(cut_extrude10_direction_2_sk1.sketch, amount=CUT_EXTRUDE10_DIRECTION_2_REACH, mode=Mode.PRIVATE) & part.part
    add(cut_extrude10_direction_2_tool1.solids().sort_by_distance((0, 36.83, -55.932058))[0], mode=Mode.SUBTRACT)


solid = part.part
